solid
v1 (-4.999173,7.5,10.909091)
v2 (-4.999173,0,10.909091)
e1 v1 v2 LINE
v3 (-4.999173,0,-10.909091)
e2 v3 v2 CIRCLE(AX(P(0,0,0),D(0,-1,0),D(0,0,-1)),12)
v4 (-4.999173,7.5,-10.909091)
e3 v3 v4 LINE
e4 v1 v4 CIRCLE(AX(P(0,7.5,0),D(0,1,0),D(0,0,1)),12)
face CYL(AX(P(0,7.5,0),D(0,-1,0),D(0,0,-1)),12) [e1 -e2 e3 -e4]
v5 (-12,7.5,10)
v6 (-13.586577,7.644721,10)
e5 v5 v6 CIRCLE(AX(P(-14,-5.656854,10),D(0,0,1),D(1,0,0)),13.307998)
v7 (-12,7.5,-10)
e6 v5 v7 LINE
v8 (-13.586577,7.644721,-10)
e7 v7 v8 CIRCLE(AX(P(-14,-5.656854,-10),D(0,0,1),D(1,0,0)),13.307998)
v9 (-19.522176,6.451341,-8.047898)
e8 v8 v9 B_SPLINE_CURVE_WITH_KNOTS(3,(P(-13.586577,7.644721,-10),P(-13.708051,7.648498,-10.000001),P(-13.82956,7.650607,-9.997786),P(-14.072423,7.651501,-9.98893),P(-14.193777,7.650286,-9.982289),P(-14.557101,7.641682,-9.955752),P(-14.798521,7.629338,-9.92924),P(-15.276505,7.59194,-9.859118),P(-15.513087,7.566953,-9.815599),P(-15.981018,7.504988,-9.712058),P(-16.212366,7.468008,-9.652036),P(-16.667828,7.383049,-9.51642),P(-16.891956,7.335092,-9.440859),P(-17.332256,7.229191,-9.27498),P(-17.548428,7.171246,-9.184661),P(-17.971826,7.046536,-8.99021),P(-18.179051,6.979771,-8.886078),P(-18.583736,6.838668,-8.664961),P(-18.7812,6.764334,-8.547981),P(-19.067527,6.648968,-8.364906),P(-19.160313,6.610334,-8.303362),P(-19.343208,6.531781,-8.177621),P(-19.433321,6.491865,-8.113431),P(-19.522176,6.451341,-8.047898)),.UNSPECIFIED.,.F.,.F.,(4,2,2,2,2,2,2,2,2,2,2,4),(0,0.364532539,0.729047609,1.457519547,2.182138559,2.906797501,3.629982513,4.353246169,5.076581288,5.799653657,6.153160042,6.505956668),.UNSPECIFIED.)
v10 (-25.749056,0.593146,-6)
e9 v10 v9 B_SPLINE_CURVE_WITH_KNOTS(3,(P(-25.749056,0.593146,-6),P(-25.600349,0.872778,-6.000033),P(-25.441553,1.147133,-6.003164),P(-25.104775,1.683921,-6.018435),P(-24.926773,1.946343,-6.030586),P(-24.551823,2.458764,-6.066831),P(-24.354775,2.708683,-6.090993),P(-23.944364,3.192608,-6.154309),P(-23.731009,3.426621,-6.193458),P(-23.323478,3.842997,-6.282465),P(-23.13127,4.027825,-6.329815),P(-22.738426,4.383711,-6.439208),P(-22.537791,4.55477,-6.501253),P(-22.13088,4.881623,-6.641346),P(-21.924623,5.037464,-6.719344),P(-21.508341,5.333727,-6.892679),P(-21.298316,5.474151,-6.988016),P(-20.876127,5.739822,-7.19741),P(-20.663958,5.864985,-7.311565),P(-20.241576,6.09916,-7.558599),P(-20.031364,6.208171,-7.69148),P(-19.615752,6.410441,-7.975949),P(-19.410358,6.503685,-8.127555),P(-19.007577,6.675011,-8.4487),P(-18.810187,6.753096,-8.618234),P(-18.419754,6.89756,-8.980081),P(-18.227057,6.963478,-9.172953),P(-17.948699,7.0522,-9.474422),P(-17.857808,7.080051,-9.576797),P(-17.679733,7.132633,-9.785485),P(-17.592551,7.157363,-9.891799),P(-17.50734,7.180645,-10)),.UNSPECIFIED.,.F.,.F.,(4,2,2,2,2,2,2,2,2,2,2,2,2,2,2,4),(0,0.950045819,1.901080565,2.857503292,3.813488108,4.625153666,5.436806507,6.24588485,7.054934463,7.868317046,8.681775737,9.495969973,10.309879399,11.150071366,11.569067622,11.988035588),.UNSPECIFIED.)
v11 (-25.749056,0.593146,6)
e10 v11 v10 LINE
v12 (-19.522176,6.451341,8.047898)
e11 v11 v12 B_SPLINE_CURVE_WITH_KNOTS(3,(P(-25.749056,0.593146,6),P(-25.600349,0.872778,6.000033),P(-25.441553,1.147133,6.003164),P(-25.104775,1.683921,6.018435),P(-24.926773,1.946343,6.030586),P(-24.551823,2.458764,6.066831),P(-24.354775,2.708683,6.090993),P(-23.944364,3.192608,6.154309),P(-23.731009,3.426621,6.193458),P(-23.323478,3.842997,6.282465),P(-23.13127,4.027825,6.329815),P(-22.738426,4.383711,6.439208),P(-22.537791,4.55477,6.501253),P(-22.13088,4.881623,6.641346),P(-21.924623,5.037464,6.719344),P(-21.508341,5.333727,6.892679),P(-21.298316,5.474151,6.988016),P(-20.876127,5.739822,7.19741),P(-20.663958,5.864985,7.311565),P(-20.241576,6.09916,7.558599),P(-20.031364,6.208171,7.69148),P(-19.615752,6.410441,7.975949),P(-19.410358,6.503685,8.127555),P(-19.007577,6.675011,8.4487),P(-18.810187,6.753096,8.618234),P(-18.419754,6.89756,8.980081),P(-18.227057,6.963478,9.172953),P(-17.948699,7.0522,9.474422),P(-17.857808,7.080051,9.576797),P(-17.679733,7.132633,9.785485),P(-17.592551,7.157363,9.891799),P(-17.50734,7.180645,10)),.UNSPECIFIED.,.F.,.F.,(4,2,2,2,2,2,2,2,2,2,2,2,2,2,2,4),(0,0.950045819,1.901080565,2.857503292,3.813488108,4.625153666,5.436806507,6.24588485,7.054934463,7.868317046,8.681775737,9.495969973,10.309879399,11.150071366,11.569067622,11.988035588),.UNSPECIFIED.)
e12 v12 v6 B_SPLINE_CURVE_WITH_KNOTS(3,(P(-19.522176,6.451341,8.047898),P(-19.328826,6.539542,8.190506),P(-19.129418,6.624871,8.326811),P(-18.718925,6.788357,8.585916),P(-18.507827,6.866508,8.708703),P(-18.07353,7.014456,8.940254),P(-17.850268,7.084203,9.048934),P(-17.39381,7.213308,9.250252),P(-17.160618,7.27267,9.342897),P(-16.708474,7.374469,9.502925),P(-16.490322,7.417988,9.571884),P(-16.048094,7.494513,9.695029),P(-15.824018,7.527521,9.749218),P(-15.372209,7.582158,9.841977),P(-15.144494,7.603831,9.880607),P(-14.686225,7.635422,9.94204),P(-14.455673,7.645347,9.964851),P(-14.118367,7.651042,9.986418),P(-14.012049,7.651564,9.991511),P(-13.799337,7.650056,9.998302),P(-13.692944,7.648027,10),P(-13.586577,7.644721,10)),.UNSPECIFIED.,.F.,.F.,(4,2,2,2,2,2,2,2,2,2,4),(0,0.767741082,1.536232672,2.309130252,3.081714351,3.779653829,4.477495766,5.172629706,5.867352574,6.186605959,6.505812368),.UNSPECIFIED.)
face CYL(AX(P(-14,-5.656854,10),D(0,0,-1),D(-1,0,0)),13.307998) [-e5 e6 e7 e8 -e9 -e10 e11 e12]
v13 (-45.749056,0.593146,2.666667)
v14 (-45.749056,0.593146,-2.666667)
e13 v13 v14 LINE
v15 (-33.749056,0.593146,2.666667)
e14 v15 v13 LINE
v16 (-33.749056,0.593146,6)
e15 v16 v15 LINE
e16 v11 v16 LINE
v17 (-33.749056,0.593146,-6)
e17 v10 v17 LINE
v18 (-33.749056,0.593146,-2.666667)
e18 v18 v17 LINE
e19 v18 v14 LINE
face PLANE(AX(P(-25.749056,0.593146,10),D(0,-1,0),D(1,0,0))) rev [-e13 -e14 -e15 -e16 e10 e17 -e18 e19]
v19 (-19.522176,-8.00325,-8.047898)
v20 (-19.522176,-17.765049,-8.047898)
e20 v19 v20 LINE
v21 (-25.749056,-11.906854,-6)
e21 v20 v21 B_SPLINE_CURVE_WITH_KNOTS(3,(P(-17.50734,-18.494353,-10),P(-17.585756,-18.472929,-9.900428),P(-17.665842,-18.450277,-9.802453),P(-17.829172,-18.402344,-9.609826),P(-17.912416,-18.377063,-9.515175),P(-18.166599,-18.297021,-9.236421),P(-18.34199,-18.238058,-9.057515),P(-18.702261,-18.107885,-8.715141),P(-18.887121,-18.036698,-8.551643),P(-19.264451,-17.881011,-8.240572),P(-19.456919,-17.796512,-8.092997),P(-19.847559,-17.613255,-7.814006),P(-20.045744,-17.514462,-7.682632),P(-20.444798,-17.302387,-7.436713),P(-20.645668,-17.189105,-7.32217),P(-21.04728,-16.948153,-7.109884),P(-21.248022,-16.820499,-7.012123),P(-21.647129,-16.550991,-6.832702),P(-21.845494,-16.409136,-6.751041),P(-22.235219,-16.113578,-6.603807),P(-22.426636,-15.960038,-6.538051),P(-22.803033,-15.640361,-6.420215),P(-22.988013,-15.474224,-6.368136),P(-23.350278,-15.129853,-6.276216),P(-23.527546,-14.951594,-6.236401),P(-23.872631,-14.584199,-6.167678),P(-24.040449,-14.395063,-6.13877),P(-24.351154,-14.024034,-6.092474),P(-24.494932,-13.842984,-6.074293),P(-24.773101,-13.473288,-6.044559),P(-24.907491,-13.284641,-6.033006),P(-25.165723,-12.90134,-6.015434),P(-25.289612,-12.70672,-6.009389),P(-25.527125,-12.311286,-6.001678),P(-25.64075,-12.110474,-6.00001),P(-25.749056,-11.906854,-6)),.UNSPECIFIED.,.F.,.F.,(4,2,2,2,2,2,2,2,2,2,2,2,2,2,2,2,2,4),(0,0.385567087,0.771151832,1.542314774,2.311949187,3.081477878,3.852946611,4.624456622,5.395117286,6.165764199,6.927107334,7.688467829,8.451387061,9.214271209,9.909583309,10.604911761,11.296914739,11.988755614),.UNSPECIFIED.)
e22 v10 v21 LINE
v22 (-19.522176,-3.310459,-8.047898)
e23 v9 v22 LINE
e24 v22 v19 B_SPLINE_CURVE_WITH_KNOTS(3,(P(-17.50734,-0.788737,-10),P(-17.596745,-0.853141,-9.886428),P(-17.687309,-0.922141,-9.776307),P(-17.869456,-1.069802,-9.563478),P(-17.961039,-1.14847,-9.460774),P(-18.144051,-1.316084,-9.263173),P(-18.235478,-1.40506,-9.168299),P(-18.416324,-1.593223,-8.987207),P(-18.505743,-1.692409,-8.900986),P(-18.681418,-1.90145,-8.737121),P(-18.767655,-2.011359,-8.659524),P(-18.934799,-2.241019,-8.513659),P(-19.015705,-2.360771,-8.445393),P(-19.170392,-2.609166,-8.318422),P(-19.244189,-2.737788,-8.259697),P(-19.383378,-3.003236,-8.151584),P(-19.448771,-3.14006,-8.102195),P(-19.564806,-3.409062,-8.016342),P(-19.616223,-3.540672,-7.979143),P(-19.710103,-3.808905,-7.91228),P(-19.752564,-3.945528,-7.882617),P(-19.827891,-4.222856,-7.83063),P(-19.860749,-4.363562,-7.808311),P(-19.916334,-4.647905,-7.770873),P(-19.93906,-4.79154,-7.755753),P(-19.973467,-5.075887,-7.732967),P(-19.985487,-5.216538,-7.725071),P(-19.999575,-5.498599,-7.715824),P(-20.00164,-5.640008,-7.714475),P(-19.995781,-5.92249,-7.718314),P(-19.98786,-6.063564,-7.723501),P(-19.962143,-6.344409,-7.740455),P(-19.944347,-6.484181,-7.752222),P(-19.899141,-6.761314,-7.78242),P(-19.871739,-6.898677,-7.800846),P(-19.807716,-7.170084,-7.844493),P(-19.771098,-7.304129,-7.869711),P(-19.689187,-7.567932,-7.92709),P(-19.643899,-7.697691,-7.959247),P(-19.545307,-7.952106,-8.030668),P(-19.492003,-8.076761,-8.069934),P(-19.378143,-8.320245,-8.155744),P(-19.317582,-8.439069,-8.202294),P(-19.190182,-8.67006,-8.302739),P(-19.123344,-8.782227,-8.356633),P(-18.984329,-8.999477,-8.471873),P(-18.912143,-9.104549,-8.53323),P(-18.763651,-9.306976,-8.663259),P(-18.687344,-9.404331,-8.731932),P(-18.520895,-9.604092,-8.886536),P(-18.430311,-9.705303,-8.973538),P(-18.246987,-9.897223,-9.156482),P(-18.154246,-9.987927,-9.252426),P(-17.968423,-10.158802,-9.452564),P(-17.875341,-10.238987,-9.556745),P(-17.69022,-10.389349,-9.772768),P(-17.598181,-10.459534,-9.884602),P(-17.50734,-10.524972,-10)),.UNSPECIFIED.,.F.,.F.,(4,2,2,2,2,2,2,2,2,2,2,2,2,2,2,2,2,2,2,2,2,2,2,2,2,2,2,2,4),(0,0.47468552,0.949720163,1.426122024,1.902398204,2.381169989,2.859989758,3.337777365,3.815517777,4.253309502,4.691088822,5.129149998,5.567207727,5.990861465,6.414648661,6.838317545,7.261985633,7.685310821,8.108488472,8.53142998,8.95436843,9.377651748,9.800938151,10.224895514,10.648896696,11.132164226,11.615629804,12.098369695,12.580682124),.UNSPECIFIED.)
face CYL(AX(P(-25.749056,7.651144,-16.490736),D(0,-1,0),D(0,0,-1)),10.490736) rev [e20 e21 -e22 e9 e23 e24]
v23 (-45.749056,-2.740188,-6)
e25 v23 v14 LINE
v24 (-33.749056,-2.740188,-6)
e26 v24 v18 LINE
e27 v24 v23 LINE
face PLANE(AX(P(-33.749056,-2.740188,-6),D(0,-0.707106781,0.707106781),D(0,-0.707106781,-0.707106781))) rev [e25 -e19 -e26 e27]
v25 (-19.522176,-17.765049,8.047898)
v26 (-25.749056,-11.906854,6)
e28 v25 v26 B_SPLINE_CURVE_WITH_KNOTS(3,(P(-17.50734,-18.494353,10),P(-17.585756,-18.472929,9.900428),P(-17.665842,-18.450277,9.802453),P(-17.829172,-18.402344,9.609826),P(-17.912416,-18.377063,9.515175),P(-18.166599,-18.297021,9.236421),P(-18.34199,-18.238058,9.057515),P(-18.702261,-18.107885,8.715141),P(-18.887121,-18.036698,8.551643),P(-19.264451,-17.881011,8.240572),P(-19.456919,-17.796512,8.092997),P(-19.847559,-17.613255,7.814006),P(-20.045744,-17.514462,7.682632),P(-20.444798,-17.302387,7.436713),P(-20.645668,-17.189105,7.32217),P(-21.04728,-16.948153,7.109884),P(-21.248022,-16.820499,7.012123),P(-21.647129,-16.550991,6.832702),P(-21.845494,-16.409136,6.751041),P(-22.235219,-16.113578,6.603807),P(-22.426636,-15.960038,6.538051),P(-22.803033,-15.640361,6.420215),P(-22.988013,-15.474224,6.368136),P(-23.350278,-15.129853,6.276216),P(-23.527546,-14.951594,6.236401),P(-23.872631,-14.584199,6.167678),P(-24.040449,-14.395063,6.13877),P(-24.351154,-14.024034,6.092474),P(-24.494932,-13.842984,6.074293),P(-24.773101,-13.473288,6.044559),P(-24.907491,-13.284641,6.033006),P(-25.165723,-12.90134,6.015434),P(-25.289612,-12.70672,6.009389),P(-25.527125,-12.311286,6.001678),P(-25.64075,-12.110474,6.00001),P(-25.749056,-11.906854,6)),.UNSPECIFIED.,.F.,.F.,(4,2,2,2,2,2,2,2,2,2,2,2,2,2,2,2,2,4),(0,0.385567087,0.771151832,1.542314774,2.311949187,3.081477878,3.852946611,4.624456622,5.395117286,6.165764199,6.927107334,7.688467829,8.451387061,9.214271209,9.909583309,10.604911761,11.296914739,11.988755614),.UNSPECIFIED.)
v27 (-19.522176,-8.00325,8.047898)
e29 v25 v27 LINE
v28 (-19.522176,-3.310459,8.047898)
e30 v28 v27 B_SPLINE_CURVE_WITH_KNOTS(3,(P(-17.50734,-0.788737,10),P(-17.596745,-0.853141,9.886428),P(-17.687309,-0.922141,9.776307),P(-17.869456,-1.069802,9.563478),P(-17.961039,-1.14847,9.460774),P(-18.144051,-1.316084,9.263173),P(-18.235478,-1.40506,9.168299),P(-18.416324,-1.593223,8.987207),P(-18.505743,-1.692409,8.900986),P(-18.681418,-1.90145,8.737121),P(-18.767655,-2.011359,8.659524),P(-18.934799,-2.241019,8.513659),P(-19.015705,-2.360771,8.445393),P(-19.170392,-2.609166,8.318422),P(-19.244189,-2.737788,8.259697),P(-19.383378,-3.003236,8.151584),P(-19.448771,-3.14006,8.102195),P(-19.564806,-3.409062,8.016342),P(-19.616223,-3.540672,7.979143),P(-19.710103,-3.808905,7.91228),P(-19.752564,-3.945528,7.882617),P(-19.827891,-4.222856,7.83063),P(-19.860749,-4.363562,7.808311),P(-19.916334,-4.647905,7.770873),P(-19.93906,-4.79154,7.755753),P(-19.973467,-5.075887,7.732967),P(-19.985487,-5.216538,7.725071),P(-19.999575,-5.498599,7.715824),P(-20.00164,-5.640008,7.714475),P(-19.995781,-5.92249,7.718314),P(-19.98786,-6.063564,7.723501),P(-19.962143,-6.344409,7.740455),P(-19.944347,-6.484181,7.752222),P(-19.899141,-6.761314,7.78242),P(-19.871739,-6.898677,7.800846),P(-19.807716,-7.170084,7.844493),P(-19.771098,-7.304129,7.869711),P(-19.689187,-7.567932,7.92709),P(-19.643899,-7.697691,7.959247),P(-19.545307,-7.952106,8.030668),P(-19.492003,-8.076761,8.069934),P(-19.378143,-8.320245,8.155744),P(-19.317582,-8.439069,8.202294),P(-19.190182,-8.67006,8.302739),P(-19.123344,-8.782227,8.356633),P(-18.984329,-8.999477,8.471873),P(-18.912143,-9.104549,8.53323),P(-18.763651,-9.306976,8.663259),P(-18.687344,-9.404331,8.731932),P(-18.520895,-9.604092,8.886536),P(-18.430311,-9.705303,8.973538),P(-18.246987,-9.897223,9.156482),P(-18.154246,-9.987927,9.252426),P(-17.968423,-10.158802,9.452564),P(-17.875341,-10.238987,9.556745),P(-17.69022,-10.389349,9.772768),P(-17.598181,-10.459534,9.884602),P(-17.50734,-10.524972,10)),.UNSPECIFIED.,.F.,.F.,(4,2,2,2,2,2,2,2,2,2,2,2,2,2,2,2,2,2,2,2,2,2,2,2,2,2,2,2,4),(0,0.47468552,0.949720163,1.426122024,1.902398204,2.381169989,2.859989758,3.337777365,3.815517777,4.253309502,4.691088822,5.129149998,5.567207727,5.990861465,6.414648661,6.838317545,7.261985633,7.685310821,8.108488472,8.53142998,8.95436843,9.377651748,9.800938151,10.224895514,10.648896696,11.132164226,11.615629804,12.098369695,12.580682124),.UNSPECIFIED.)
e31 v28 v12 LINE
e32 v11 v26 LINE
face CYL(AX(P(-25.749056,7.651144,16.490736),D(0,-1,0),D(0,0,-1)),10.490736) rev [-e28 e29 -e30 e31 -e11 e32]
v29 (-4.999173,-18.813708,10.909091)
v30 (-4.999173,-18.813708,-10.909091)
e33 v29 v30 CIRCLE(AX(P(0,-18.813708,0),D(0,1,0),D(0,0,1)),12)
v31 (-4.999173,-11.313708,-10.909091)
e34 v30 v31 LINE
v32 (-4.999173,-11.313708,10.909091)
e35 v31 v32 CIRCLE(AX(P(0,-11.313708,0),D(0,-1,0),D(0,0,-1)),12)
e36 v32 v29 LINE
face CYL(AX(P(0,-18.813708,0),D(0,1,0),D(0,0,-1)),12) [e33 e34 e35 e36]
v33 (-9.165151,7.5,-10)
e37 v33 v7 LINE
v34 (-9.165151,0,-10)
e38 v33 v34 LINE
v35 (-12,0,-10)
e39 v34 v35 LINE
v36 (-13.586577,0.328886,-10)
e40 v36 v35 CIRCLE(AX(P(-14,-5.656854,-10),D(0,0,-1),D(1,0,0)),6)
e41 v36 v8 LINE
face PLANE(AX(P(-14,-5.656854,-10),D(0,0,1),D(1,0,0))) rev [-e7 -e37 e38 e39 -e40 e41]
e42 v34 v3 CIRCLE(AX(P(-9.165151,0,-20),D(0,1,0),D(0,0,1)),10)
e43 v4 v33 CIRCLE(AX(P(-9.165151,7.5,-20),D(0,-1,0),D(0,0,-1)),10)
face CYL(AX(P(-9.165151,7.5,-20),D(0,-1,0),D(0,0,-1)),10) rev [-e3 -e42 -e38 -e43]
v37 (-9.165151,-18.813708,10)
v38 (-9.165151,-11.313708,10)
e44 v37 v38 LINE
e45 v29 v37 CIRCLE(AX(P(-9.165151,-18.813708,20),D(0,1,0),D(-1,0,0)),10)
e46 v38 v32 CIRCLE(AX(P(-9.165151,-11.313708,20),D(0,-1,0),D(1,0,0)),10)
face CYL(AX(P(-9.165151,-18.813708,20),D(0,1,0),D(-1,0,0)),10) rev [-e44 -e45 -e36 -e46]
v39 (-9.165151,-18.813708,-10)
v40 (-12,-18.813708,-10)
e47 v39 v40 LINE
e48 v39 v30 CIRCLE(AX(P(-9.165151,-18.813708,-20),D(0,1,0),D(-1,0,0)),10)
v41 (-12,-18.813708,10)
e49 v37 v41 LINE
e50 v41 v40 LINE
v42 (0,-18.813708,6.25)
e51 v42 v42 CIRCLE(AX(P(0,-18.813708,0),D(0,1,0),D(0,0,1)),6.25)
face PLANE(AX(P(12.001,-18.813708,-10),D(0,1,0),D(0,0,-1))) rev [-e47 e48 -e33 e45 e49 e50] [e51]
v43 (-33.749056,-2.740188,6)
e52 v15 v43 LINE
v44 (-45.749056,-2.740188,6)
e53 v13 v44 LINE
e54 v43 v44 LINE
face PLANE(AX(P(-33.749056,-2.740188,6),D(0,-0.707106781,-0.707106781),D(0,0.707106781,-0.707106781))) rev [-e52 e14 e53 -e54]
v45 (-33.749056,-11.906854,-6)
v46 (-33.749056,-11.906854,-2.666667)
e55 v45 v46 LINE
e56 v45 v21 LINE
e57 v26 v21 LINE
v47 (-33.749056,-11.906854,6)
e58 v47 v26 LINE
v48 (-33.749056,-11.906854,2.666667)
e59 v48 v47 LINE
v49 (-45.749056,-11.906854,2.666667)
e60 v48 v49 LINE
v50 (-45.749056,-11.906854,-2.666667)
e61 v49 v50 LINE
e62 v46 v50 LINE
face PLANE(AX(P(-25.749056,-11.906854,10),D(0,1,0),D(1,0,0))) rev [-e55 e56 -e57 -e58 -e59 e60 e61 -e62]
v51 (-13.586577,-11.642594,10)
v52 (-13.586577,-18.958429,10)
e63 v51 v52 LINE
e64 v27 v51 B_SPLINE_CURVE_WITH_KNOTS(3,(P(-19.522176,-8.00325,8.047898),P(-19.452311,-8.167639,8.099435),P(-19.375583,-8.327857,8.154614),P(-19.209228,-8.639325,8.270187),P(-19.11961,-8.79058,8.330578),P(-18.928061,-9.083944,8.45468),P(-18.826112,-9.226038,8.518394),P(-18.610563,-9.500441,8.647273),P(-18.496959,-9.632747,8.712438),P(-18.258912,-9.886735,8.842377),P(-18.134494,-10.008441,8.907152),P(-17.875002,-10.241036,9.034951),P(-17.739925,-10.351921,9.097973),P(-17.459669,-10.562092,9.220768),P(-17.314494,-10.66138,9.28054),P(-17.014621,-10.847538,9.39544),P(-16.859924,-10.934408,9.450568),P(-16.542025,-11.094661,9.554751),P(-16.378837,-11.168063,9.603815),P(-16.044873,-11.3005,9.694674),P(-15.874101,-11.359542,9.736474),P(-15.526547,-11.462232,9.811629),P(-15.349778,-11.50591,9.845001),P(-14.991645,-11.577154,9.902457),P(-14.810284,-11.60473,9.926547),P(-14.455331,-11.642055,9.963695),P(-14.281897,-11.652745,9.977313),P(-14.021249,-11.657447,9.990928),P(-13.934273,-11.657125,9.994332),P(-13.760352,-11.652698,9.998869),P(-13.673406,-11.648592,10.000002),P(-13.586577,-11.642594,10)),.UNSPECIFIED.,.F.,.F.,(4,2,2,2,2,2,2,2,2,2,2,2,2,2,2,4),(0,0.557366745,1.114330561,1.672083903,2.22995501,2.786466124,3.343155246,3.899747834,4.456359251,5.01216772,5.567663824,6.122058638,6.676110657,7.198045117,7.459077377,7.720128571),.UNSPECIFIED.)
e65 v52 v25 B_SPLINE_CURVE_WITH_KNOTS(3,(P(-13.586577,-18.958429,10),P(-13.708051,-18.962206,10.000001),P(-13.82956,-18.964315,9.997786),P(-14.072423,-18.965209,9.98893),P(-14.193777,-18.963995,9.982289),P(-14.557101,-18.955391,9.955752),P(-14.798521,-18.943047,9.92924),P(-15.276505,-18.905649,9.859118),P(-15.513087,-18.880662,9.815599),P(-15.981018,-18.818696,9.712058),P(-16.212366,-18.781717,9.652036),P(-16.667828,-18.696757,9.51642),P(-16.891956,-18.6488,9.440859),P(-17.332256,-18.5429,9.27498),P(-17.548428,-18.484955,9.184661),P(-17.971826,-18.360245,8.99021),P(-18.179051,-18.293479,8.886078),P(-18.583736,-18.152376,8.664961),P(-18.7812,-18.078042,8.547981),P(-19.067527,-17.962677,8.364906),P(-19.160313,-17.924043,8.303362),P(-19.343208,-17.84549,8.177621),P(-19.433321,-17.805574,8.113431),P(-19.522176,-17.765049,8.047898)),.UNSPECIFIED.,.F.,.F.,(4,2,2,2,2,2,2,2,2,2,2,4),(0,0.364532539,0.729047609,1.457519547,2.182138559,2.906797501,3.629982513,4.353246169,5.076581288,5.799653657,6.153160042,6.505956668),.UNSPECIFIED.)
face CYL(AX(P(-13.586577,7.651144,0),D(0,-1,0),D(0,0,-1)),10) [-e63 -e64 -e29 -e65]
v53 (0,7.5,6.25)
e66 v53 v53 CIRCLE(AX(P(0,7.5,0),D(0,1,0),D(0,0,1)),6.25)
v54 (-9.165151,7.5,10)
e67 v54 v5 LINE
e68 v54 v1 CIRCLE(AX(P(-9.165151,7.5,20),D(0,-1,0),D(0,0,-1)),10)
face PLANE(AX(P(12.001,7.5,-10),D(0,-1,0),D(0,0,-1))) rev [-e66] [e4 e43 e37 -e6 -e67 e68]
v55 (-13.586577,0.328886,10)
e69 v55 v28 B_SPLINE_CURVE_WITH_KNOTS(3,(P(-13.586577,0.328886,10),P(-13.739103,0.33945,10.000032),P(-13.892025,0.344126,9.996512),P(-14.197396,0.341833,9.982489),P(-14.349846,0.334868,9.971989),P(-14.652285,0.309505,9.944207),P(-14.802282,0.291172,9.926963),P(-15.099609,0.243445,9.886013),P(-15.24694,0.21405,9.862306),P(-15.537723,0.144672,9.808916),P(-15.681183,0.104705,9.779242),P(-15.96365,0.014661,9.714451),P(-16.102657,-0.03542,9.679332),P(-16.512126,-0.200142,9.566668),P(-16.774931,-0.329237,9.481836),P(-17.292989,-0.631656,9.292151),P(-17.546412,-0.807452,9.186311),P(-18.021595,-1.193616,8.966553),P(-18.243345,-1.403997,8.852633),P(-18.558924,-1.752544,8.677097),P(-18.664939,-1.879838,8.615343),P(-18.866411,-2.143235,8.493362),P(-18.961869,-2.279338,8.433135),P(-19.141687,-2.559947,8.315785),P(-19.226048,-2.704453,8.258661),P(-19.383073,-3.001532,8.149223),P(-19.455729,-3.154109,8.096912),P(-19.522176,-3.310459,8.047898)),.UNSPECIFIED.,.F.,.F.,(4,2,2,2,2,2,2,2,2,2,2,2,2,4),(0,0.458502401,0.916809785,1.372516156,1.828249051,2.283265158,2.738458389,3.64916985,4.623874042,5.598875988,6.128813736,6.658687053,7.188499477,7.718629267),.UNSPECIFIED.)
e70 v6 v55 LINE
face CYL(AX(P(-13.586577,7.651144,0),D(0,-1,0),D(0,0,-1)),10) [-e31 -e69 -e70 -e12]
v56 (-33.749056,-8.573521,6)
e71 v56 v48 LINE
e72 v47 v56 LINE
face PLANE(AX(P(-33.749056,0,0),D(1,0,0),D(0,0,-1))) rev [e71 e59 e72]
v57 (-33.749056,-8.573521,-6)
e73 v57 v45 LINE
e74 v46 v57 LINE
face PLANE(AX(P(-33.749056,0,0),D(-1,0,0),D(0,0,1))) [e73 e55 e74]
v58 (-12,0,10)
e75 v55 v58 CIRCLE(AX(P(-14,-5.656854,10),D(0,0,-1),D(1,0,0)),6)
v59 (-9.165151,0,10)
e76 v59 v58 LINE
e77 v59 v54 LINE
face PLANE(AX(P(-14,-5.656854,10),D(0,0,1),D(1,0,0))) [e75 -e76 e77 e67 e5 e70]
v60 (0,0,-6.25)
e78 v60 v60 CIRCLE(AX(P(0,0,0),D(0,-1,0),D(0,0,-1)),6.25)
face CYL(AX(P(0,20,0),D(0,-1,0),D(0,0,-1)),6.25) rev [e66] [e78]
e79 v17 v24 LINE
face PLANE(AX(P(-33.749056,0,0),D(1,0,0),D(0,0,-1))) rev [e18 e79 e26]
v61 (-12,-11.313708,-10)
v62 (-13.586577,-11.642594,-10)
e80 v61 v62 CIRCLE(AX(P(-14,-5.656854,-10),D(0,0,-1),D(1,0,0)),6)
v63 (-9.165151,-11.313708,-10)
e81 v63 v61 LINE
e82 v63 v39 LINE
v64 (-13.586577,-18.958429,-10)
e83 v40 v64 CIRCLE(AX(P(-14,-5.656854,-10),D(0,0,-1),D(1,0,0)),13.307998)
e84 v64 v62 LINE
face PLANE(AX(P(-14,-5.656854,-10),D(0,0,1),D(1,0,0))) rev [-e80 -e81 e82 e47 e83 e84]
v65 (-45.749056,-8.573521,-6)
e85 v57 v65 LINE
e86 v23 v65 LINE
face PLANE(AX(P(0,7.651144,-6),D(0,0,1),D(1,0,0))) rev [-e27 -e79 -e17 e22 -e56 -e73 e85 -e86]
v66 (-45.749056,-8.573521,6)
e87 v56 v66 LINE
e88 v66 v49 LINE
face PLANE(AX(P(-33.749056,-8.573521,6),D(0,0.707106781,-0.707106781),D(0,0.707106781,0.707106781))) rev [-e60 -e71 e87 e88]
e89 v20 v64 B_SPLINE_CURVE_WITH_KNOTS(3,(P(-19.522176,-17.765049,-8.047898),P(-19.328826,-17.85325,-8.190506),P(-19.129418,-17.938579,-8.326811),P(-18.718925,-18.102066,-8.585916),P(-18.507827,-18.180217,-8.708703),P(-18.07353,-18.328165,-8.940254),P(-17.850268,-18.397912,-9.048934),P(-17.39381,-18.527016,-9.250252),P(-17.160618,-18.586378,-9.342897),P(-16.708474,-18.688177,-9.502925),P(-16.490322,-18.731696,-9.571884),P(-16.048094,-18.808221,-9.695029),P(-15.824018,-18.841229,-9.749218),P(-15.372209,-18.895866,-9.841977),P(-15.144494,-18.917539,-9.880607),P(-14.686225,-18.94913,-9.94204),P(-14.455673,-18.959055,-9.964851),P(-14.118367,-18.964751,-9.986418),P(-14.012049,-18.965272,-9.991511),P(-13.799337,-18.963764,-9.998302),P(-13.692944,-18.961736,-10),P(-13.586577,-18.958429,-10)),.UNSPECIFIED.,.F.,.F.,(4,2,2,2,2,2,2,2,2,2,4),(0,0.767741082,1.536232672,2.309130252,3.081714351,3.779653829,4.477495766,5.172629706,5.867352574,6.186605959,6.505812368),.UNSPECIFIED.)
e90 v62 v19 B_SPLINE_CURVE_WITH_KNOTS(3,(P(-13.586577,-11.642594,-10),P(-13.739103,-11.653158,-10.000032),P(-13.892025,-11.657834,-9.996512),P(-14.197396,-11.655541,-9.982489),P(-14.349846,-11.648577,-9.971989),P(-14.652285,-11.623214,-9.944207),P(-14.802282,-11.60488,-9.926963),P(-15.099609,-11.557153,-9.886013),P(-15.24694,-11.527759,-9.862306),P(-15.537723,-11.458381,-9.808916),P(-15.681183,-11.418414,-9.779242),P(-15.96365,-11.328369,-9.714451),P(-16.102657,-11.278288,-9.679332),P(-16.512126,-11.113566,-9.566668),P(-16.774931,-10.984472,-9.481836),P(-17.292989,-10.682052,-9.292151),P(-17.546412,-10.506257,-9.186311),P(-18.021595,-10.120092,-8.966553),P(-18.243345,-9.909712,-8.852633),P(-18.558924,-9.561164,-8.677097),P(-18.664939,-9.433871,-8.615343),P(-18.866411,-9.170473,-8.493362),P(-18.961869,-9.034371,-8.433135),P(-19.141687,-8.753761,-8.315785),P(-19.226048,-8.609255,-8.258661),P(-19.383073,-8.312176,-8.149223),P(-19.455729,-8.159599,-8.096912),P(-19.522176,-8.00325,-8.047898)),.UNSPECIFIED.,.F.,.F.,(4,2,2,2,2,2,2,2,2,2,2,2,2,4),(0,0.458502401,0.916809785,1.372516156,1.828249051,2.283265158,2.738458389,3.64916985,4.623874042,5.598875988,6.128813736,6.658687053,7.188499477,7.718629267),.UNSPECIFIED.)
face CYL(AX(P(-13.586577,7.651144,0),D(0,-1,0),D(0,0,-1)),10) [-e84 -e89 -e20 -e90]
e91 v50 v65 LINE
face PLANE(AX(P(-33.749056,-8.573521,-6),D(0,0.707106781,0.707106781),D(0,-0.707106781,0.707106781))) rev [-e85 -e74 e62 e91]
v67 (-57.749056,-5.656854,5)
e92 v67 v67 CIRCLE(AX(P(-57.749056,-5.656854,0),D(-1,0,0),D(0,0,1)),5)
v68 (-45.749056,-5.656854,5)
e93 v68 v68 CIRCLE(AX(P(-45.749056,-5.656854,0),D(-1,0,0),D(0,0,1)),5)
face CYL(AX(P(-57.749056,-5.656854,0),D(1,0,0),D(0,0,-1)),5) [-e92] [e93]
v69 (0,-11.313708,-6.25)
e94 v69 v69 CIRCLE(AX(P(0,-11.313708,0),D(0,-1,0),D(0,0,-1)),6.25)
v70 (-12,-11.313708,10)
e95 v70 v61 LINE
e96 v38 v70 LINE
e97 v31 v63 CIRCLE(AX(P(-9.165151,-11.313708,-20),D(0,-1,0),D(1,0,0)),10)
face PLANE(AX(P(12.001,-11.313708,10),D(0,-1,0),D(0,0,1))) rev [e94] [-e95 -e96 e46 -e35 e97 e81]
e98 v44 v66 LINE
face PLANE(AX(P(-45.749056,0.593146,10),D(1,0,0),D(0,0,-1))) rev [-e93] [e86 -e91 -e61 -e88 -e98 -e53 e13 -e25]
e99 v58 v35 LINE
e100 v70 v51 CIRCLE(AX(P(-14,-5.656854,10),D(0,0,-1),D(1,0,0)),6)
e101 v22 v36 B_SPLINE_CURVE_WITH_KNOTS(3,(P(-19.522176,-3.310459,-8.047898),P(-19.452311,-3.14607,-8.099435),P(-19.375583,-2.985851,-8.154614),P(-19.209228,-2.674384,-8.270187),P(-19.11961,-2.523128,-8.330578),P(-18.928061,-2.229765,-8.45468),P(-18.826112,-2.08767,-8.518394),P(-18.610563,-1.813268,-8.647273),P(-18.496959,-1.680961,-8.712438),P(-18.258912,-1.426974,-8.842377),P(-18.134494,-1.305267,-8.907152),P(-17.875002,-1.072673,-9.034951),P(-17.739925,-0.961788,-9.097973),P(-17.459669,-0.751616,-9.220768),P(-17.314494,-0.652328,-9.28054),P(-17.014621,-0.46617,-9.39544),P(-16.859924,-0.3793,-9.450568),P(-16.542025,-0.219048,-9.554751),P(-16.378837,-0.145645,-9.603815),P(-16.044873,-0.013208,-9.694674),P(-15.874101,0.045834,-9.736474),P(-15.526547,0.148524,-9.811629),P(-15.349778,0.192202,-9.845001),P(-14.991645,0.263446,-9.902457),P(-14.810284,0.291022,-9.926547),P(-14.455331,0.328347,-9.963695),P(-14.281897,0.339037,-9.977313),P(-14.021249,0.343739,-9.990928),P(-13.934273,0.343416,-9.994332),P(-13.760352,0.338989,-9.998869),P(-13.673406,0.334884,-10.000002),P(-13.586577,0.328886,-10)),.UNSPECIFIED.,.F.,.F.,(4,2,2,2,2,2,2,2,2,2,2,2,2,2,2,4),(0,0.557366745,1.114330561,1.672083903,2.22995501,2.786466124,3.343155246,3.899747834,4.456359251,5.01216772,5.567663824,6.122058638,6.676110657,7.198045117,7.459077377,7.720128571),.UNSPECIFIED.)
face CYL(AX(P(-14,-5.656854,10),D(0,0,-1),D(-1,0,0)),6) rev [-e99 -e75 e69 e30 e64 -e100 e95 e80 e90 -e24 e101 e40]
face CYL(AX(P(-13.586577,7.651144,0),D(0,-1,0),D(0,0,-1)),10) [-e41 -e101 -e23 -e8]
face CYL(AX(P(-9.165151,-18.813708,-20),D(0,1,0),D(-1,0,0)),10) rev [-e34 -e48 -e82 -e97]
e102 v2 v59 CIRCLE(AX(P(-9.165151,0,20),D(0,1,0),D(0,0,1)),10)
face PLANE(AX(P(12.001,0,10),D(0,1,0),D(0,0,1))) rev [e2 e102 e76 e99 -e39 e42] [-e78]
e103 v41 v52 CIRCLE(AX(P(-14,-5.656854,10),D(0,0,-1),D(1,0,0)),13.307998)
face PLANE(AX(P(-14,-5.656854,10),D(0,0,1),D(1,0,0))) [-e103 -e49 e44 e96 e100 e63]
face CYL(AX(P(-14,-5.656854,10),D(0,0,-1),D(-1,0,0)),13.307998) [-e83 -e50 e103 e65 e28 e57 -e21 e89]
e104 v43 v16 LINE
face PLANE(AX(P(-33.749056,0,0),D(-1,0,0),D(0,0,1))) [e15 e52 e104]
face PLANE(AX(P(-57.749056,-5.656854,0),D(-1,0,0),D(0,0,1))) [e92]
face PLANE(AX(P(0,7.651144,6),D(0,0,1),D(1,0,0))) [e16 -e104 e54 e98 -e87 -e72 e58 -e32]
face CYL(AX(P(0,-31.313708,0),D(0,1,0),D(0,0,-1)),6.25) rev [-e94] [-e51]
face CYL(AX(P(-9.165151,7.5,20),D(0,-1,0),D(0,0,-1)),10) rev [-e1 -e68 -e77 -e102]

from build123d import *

# Parameters (mm, degrees)
SKETCH4_R               = 12
SKETCH4_R_2             = 6.25
BOSS_EXTRUDE2_DEPTH     = 7.5
BOSS_EXTRUDE3_DEPTH     = 10
SKETCH6_R               = 6.25
CUT_EXTRUDE1_DEPTH      = 20
SKETCH7_W               = 20
SKETCH7_H               = 7.5
BOSS_EXTRUDE4_DEPTH     = 5.36675
CUT_EXTRUDE2_DEPTH      = 50.133277179
CUT_EXTRUDE2_DEPTH_BACK = 50.133277179
FILLET1_R               = 10
FILLET2_R               = 10
CUT_EXTRUDE3_DEPTH      = 12
SKETCH10_R              = 5
BOSS_EXTRUDE5_DEPTH     = 12
FILLET3_R               = 10


with BuildPart() as part:
    # Sketch4 → Boss-Extrude2 (new body)
    with BuildSketch(Plane(origin=(0, 0, 0), x_dir=(1, 0, 0), z_dir=(0, 1, 0))):
        with Locations(Location((0, 0, 0), (0, 0, 270))):
            Circle(SKETCH4_R)
        with Locations(Location((0, 0, 0), (0, 0, 270))):
            Circle(SKETCH4_R_2, mode=Mode.SUBTRACT)
    extrude(amount=BOSS_EXTRUDE2_DEPTH)

    # Sketch5 → Boss-Extrude3 (add, symmetric)
    with BuildSketch(Plane.XY):
        with BuildLine():
            Line((-25.749055866, 0.593145751), (-45.749055866, 0.593145751))
            Line((-45.749055866, 0.593145751), (-45.749055866, -5.656854249))
            Line((-45.749055866, -5.656854249), (-20, -5.656854249))
            ThreePointArc((-20, -5.656854249), (-17.464101615, -0.757874764), (-12, 0))
            Line((-12, 0), (12, 0))
            Line((12, 0), (12, 7.5))
            Line((12, 7.5), (-12, 7.5))
            ThreePointArc((-12, 7.5), (-19.973874913, 6.234976235), (-25.749055866, 0.593145751))
        make_face()
    extrude(amount=BOSS_EXTRUDE3_DEPTH, both=True)

    # Sketch6 → Cut-Extrude1 (cut)
    with BuildSketch(Plane.XZ):
        with BuildLine():
            Line((6.633249581, -10), (12, -10))
            Line((12, -10), (12, 0))
            ThreePointArc((12, 0), (10.573528147, -5.674548662), (6.633249581, -10))
        make_face()
        with BuildLine():
            ThreePointArc((6.633249581, 10), (10.573528147, 5.674548662), (12, 0))
            Line((12, 0), (12, 10))
            Line((12, 10), (6.633249581, 10))
        make_face()
        with BuildLine():
            Line((-12, -10), (-6.633249581, -10))
            ThreePointArc((-6.633249581, -10), (-10.573528147, -5.674548662), (-12, 0))
            Line((-12, 0), (-12, -10))
        make_face()
        with BuildLine():
            ThreePointArc((-12, 0), (-10.573528147, 5.674548662), (-6.633249581, 10))
            Line((-6.633249581, 10), (-12, 10))
            Line((-12, 10), (-12, 0))
        make_face()
        with Locations(Location((0, 0, 0), (0, 0, 270))):
            Circle(SKETCH6_R)
    extrude(amount=-CUT_EXTRUDE1_DEPTH, mode=Mode.SUBTRACT)


with BuildPart() as cut_extrude1_piece_1:
    # of the separate pieces the step leaves, piece 1, a body of its own (cut_extrude1_pieces)
    add(part.part.solids().sort_by_distance((-45.749055866, -5.656854249, 10))[0])



with BuildPart() as cut_extrude1_piece_2:
    # of the separate pieces the step leaves, piece 2, a body of its own (cut_extrude1_pieces)
    add(part.part.solids().sort_by_distance((-6.633249581, 0, 10))[0])


with BuildPart() as cut_extrude1_piece_1_1:
    add(cut_extrude1_piece_1.part)

    add(cut_extrude1_piece_2.part)  # Boss-Extrude4 merges Cut-Extrude1 piece 2
    # Sketch7 → Boss-Extrude4 (add)
    with BuildSketch(Plane(origin=(-12, 0, 0), x_dir=(0, 0, -1), z_dir=(1, 0, 0))):
        with Locations((0, 3.75)):
            Rectangle(SKETCH7_W, SKETCH7_H)
    extrude(amount=BOSS_EXTRUDE4_DEPTH)

    # Mirror2: Cut-Extrude1 piece 1 across plane


with BuildPart() as cut_extrude1_piece_1_2:
    add(cut_extrude1_piece_1_1.part)
    add(cut_extrude1_piece_1_1.part.mirror(Plane(origin=(-45.749055866, -5.656854249, 10), x_dir=(0, 0, 1), z_dir=(0, 1, 0))))

    # Sketch8 → Cut-Extrude2 (cut, two sides: drawn at the far end of the back side and taken through both)
    with BuildSketch(Plane(origin=(0, -5.656854249, 0), x_dir=(-1, 0, 0), z_dir=(0, -1, 0)).offset(-CUT_EXTRUDE2_DEPTH_BACK)):
        with BuildLine():
            ThreePointArc((17.507339718, 10), (21.168502268, 7.052829994), (25.749055866, 6))
            Line((25.749055866, 6), (45.749055866, 6))
            Line((45.749055866, 6), (45.749055866, 10))
            Line((45.749055866, 10), (17.507339718, 10))
        make_face()
        with BuildLine():
            Line((45.749055866, -10), (45.749055866, -6))
            Line((45.749055866, -6), (25.749055866, -6))
            ThreePointArc((25.749055866, -6), (21.168502268, -7.052829994), (17.507339718, -10))
            Line((17.507339718, -10), (45.749055866, -10))
        make_face()
    extrude(amount=CUT_EXTRUDE2_DEPTH + CUT_EXTRUDE2_DEPTH_BACK, mode=Mode.SUBTRACT)

    # Fillet1
    # the kernel refuses this fillet: 10 mm, written as the material it takes off along each edge
    with BuildSketch(Plane(origin=(-17.507339718, -28.296259364, -10), x_dir=(1, 0, 0), z_dir=(0, 1, 0)), Plane(origin=(-17.507339718, -10.590642804, -10), x_dir=(1, 0, 0), z_dir=(0, 1, 0))) as fillet1_piece_1:
        with BuildLine():
            CenterArc((3.920762426, -10), FILLET1_R, 90, 36.410037128)
            ThreePointArc((-2.014836369, -1.952101707), (-0.941870787, -1.043704746), (0, 0))
            Line((0, 0), (3.920762426, 0))
        make_face()
    extrude(amount=27.573193669, mode=Mode.SUBTRACT)

    # Fillet2
    # the kernel refuses this fillet: 10 mm, written as the material it takes off along each edge
    with BuildSketch(Plane(origin=(-17.507339718, -10.590642804, 10), x_dir=(-0.718199432618455, 0, -0.6958373193401812), z_dir=(0, 1, 0))) as fillet2_piece_1:
        with BuildLine():
            CenterArc((4.142483844, -9.910207143), FILLET2_R, 97.683941218, 36.410037128)
            Line((-2.81588935, -2.728212816), (0, 0))
            ThreePointArc((0, 0), (1.402699778, -0.094199313), (2.805399556, 0))
        make_face()
    extrude(amount=27.573193669, mode=Mode.SUBTRACT)
    with BuildSketch(Plane(origin=(-17.507339718, -28.296259364, 10), x_dir=(1, 0, 0), z_dir=(0, 1, 0))) as fillet2_piece_2:
        with BuildLine():
            CenterArc((3.920762426, 10), FILLET2_R, 233.589962872, 36.410037128)
            ThreePointArc((-2.014836369, 1.952101707), (-0.941870787, 1.043704746), (0, 0))
            Line((0, 0), (3.920762426, 0))
        make_face()
    extrude(amount=27.573193669, mode=Mode.SUBTRACT)

    # Sketch9 → Cut-Extrude3 (cut)
    with BuildSketch(Plane.ZY.offset(45.749055866)):
        Polygon((-6, -2.740187583), (-2.666666667, 0.593145751), (-6, 0.593145751), align=None)
        Polygon((6, 0.593145751), (2.666666667, 0.593145751), (6, -2.740187583), align=None)
        Polygon((6, -8.573520916), (6, -11.906854249), (2.666666667, -11.906854249), align=None)
        Polygon((-6, -8.573520916), (-6, -11.906854249), (-2.666666667, -11.906854249), align=None)
    extrude(amount=-CUT_EXTRUDE3_DEPTH, mode=Mode.SUBTRACT)

    # Sketch10 → Boss-Extrude5 (add)
    with BuildSketch(Plane.ZY.offset(45.749055866)):
        with Locations((0, -5.656854249)):
            Circle(SKETCH10_R)
    extrude(amount=BOSS_EXTRUDE5_DEPTH)

    # Fillet3
    fillet3_edges = [cut_extrude1_piece_1_2.edges().sort_by_distance(p)[0] for p in [
        (-6.633249581, 3.75, 10),
        (-6.633249581, 3.75, -10),
        (-6.633249581, -15.063708499, -10),
        (-6.633249581, -15.063708499, 10),
    ]]
    fillet(fillet3_edges, radius=FILLET3_R)


solid = cut_extrude1_piece_1_2.part
